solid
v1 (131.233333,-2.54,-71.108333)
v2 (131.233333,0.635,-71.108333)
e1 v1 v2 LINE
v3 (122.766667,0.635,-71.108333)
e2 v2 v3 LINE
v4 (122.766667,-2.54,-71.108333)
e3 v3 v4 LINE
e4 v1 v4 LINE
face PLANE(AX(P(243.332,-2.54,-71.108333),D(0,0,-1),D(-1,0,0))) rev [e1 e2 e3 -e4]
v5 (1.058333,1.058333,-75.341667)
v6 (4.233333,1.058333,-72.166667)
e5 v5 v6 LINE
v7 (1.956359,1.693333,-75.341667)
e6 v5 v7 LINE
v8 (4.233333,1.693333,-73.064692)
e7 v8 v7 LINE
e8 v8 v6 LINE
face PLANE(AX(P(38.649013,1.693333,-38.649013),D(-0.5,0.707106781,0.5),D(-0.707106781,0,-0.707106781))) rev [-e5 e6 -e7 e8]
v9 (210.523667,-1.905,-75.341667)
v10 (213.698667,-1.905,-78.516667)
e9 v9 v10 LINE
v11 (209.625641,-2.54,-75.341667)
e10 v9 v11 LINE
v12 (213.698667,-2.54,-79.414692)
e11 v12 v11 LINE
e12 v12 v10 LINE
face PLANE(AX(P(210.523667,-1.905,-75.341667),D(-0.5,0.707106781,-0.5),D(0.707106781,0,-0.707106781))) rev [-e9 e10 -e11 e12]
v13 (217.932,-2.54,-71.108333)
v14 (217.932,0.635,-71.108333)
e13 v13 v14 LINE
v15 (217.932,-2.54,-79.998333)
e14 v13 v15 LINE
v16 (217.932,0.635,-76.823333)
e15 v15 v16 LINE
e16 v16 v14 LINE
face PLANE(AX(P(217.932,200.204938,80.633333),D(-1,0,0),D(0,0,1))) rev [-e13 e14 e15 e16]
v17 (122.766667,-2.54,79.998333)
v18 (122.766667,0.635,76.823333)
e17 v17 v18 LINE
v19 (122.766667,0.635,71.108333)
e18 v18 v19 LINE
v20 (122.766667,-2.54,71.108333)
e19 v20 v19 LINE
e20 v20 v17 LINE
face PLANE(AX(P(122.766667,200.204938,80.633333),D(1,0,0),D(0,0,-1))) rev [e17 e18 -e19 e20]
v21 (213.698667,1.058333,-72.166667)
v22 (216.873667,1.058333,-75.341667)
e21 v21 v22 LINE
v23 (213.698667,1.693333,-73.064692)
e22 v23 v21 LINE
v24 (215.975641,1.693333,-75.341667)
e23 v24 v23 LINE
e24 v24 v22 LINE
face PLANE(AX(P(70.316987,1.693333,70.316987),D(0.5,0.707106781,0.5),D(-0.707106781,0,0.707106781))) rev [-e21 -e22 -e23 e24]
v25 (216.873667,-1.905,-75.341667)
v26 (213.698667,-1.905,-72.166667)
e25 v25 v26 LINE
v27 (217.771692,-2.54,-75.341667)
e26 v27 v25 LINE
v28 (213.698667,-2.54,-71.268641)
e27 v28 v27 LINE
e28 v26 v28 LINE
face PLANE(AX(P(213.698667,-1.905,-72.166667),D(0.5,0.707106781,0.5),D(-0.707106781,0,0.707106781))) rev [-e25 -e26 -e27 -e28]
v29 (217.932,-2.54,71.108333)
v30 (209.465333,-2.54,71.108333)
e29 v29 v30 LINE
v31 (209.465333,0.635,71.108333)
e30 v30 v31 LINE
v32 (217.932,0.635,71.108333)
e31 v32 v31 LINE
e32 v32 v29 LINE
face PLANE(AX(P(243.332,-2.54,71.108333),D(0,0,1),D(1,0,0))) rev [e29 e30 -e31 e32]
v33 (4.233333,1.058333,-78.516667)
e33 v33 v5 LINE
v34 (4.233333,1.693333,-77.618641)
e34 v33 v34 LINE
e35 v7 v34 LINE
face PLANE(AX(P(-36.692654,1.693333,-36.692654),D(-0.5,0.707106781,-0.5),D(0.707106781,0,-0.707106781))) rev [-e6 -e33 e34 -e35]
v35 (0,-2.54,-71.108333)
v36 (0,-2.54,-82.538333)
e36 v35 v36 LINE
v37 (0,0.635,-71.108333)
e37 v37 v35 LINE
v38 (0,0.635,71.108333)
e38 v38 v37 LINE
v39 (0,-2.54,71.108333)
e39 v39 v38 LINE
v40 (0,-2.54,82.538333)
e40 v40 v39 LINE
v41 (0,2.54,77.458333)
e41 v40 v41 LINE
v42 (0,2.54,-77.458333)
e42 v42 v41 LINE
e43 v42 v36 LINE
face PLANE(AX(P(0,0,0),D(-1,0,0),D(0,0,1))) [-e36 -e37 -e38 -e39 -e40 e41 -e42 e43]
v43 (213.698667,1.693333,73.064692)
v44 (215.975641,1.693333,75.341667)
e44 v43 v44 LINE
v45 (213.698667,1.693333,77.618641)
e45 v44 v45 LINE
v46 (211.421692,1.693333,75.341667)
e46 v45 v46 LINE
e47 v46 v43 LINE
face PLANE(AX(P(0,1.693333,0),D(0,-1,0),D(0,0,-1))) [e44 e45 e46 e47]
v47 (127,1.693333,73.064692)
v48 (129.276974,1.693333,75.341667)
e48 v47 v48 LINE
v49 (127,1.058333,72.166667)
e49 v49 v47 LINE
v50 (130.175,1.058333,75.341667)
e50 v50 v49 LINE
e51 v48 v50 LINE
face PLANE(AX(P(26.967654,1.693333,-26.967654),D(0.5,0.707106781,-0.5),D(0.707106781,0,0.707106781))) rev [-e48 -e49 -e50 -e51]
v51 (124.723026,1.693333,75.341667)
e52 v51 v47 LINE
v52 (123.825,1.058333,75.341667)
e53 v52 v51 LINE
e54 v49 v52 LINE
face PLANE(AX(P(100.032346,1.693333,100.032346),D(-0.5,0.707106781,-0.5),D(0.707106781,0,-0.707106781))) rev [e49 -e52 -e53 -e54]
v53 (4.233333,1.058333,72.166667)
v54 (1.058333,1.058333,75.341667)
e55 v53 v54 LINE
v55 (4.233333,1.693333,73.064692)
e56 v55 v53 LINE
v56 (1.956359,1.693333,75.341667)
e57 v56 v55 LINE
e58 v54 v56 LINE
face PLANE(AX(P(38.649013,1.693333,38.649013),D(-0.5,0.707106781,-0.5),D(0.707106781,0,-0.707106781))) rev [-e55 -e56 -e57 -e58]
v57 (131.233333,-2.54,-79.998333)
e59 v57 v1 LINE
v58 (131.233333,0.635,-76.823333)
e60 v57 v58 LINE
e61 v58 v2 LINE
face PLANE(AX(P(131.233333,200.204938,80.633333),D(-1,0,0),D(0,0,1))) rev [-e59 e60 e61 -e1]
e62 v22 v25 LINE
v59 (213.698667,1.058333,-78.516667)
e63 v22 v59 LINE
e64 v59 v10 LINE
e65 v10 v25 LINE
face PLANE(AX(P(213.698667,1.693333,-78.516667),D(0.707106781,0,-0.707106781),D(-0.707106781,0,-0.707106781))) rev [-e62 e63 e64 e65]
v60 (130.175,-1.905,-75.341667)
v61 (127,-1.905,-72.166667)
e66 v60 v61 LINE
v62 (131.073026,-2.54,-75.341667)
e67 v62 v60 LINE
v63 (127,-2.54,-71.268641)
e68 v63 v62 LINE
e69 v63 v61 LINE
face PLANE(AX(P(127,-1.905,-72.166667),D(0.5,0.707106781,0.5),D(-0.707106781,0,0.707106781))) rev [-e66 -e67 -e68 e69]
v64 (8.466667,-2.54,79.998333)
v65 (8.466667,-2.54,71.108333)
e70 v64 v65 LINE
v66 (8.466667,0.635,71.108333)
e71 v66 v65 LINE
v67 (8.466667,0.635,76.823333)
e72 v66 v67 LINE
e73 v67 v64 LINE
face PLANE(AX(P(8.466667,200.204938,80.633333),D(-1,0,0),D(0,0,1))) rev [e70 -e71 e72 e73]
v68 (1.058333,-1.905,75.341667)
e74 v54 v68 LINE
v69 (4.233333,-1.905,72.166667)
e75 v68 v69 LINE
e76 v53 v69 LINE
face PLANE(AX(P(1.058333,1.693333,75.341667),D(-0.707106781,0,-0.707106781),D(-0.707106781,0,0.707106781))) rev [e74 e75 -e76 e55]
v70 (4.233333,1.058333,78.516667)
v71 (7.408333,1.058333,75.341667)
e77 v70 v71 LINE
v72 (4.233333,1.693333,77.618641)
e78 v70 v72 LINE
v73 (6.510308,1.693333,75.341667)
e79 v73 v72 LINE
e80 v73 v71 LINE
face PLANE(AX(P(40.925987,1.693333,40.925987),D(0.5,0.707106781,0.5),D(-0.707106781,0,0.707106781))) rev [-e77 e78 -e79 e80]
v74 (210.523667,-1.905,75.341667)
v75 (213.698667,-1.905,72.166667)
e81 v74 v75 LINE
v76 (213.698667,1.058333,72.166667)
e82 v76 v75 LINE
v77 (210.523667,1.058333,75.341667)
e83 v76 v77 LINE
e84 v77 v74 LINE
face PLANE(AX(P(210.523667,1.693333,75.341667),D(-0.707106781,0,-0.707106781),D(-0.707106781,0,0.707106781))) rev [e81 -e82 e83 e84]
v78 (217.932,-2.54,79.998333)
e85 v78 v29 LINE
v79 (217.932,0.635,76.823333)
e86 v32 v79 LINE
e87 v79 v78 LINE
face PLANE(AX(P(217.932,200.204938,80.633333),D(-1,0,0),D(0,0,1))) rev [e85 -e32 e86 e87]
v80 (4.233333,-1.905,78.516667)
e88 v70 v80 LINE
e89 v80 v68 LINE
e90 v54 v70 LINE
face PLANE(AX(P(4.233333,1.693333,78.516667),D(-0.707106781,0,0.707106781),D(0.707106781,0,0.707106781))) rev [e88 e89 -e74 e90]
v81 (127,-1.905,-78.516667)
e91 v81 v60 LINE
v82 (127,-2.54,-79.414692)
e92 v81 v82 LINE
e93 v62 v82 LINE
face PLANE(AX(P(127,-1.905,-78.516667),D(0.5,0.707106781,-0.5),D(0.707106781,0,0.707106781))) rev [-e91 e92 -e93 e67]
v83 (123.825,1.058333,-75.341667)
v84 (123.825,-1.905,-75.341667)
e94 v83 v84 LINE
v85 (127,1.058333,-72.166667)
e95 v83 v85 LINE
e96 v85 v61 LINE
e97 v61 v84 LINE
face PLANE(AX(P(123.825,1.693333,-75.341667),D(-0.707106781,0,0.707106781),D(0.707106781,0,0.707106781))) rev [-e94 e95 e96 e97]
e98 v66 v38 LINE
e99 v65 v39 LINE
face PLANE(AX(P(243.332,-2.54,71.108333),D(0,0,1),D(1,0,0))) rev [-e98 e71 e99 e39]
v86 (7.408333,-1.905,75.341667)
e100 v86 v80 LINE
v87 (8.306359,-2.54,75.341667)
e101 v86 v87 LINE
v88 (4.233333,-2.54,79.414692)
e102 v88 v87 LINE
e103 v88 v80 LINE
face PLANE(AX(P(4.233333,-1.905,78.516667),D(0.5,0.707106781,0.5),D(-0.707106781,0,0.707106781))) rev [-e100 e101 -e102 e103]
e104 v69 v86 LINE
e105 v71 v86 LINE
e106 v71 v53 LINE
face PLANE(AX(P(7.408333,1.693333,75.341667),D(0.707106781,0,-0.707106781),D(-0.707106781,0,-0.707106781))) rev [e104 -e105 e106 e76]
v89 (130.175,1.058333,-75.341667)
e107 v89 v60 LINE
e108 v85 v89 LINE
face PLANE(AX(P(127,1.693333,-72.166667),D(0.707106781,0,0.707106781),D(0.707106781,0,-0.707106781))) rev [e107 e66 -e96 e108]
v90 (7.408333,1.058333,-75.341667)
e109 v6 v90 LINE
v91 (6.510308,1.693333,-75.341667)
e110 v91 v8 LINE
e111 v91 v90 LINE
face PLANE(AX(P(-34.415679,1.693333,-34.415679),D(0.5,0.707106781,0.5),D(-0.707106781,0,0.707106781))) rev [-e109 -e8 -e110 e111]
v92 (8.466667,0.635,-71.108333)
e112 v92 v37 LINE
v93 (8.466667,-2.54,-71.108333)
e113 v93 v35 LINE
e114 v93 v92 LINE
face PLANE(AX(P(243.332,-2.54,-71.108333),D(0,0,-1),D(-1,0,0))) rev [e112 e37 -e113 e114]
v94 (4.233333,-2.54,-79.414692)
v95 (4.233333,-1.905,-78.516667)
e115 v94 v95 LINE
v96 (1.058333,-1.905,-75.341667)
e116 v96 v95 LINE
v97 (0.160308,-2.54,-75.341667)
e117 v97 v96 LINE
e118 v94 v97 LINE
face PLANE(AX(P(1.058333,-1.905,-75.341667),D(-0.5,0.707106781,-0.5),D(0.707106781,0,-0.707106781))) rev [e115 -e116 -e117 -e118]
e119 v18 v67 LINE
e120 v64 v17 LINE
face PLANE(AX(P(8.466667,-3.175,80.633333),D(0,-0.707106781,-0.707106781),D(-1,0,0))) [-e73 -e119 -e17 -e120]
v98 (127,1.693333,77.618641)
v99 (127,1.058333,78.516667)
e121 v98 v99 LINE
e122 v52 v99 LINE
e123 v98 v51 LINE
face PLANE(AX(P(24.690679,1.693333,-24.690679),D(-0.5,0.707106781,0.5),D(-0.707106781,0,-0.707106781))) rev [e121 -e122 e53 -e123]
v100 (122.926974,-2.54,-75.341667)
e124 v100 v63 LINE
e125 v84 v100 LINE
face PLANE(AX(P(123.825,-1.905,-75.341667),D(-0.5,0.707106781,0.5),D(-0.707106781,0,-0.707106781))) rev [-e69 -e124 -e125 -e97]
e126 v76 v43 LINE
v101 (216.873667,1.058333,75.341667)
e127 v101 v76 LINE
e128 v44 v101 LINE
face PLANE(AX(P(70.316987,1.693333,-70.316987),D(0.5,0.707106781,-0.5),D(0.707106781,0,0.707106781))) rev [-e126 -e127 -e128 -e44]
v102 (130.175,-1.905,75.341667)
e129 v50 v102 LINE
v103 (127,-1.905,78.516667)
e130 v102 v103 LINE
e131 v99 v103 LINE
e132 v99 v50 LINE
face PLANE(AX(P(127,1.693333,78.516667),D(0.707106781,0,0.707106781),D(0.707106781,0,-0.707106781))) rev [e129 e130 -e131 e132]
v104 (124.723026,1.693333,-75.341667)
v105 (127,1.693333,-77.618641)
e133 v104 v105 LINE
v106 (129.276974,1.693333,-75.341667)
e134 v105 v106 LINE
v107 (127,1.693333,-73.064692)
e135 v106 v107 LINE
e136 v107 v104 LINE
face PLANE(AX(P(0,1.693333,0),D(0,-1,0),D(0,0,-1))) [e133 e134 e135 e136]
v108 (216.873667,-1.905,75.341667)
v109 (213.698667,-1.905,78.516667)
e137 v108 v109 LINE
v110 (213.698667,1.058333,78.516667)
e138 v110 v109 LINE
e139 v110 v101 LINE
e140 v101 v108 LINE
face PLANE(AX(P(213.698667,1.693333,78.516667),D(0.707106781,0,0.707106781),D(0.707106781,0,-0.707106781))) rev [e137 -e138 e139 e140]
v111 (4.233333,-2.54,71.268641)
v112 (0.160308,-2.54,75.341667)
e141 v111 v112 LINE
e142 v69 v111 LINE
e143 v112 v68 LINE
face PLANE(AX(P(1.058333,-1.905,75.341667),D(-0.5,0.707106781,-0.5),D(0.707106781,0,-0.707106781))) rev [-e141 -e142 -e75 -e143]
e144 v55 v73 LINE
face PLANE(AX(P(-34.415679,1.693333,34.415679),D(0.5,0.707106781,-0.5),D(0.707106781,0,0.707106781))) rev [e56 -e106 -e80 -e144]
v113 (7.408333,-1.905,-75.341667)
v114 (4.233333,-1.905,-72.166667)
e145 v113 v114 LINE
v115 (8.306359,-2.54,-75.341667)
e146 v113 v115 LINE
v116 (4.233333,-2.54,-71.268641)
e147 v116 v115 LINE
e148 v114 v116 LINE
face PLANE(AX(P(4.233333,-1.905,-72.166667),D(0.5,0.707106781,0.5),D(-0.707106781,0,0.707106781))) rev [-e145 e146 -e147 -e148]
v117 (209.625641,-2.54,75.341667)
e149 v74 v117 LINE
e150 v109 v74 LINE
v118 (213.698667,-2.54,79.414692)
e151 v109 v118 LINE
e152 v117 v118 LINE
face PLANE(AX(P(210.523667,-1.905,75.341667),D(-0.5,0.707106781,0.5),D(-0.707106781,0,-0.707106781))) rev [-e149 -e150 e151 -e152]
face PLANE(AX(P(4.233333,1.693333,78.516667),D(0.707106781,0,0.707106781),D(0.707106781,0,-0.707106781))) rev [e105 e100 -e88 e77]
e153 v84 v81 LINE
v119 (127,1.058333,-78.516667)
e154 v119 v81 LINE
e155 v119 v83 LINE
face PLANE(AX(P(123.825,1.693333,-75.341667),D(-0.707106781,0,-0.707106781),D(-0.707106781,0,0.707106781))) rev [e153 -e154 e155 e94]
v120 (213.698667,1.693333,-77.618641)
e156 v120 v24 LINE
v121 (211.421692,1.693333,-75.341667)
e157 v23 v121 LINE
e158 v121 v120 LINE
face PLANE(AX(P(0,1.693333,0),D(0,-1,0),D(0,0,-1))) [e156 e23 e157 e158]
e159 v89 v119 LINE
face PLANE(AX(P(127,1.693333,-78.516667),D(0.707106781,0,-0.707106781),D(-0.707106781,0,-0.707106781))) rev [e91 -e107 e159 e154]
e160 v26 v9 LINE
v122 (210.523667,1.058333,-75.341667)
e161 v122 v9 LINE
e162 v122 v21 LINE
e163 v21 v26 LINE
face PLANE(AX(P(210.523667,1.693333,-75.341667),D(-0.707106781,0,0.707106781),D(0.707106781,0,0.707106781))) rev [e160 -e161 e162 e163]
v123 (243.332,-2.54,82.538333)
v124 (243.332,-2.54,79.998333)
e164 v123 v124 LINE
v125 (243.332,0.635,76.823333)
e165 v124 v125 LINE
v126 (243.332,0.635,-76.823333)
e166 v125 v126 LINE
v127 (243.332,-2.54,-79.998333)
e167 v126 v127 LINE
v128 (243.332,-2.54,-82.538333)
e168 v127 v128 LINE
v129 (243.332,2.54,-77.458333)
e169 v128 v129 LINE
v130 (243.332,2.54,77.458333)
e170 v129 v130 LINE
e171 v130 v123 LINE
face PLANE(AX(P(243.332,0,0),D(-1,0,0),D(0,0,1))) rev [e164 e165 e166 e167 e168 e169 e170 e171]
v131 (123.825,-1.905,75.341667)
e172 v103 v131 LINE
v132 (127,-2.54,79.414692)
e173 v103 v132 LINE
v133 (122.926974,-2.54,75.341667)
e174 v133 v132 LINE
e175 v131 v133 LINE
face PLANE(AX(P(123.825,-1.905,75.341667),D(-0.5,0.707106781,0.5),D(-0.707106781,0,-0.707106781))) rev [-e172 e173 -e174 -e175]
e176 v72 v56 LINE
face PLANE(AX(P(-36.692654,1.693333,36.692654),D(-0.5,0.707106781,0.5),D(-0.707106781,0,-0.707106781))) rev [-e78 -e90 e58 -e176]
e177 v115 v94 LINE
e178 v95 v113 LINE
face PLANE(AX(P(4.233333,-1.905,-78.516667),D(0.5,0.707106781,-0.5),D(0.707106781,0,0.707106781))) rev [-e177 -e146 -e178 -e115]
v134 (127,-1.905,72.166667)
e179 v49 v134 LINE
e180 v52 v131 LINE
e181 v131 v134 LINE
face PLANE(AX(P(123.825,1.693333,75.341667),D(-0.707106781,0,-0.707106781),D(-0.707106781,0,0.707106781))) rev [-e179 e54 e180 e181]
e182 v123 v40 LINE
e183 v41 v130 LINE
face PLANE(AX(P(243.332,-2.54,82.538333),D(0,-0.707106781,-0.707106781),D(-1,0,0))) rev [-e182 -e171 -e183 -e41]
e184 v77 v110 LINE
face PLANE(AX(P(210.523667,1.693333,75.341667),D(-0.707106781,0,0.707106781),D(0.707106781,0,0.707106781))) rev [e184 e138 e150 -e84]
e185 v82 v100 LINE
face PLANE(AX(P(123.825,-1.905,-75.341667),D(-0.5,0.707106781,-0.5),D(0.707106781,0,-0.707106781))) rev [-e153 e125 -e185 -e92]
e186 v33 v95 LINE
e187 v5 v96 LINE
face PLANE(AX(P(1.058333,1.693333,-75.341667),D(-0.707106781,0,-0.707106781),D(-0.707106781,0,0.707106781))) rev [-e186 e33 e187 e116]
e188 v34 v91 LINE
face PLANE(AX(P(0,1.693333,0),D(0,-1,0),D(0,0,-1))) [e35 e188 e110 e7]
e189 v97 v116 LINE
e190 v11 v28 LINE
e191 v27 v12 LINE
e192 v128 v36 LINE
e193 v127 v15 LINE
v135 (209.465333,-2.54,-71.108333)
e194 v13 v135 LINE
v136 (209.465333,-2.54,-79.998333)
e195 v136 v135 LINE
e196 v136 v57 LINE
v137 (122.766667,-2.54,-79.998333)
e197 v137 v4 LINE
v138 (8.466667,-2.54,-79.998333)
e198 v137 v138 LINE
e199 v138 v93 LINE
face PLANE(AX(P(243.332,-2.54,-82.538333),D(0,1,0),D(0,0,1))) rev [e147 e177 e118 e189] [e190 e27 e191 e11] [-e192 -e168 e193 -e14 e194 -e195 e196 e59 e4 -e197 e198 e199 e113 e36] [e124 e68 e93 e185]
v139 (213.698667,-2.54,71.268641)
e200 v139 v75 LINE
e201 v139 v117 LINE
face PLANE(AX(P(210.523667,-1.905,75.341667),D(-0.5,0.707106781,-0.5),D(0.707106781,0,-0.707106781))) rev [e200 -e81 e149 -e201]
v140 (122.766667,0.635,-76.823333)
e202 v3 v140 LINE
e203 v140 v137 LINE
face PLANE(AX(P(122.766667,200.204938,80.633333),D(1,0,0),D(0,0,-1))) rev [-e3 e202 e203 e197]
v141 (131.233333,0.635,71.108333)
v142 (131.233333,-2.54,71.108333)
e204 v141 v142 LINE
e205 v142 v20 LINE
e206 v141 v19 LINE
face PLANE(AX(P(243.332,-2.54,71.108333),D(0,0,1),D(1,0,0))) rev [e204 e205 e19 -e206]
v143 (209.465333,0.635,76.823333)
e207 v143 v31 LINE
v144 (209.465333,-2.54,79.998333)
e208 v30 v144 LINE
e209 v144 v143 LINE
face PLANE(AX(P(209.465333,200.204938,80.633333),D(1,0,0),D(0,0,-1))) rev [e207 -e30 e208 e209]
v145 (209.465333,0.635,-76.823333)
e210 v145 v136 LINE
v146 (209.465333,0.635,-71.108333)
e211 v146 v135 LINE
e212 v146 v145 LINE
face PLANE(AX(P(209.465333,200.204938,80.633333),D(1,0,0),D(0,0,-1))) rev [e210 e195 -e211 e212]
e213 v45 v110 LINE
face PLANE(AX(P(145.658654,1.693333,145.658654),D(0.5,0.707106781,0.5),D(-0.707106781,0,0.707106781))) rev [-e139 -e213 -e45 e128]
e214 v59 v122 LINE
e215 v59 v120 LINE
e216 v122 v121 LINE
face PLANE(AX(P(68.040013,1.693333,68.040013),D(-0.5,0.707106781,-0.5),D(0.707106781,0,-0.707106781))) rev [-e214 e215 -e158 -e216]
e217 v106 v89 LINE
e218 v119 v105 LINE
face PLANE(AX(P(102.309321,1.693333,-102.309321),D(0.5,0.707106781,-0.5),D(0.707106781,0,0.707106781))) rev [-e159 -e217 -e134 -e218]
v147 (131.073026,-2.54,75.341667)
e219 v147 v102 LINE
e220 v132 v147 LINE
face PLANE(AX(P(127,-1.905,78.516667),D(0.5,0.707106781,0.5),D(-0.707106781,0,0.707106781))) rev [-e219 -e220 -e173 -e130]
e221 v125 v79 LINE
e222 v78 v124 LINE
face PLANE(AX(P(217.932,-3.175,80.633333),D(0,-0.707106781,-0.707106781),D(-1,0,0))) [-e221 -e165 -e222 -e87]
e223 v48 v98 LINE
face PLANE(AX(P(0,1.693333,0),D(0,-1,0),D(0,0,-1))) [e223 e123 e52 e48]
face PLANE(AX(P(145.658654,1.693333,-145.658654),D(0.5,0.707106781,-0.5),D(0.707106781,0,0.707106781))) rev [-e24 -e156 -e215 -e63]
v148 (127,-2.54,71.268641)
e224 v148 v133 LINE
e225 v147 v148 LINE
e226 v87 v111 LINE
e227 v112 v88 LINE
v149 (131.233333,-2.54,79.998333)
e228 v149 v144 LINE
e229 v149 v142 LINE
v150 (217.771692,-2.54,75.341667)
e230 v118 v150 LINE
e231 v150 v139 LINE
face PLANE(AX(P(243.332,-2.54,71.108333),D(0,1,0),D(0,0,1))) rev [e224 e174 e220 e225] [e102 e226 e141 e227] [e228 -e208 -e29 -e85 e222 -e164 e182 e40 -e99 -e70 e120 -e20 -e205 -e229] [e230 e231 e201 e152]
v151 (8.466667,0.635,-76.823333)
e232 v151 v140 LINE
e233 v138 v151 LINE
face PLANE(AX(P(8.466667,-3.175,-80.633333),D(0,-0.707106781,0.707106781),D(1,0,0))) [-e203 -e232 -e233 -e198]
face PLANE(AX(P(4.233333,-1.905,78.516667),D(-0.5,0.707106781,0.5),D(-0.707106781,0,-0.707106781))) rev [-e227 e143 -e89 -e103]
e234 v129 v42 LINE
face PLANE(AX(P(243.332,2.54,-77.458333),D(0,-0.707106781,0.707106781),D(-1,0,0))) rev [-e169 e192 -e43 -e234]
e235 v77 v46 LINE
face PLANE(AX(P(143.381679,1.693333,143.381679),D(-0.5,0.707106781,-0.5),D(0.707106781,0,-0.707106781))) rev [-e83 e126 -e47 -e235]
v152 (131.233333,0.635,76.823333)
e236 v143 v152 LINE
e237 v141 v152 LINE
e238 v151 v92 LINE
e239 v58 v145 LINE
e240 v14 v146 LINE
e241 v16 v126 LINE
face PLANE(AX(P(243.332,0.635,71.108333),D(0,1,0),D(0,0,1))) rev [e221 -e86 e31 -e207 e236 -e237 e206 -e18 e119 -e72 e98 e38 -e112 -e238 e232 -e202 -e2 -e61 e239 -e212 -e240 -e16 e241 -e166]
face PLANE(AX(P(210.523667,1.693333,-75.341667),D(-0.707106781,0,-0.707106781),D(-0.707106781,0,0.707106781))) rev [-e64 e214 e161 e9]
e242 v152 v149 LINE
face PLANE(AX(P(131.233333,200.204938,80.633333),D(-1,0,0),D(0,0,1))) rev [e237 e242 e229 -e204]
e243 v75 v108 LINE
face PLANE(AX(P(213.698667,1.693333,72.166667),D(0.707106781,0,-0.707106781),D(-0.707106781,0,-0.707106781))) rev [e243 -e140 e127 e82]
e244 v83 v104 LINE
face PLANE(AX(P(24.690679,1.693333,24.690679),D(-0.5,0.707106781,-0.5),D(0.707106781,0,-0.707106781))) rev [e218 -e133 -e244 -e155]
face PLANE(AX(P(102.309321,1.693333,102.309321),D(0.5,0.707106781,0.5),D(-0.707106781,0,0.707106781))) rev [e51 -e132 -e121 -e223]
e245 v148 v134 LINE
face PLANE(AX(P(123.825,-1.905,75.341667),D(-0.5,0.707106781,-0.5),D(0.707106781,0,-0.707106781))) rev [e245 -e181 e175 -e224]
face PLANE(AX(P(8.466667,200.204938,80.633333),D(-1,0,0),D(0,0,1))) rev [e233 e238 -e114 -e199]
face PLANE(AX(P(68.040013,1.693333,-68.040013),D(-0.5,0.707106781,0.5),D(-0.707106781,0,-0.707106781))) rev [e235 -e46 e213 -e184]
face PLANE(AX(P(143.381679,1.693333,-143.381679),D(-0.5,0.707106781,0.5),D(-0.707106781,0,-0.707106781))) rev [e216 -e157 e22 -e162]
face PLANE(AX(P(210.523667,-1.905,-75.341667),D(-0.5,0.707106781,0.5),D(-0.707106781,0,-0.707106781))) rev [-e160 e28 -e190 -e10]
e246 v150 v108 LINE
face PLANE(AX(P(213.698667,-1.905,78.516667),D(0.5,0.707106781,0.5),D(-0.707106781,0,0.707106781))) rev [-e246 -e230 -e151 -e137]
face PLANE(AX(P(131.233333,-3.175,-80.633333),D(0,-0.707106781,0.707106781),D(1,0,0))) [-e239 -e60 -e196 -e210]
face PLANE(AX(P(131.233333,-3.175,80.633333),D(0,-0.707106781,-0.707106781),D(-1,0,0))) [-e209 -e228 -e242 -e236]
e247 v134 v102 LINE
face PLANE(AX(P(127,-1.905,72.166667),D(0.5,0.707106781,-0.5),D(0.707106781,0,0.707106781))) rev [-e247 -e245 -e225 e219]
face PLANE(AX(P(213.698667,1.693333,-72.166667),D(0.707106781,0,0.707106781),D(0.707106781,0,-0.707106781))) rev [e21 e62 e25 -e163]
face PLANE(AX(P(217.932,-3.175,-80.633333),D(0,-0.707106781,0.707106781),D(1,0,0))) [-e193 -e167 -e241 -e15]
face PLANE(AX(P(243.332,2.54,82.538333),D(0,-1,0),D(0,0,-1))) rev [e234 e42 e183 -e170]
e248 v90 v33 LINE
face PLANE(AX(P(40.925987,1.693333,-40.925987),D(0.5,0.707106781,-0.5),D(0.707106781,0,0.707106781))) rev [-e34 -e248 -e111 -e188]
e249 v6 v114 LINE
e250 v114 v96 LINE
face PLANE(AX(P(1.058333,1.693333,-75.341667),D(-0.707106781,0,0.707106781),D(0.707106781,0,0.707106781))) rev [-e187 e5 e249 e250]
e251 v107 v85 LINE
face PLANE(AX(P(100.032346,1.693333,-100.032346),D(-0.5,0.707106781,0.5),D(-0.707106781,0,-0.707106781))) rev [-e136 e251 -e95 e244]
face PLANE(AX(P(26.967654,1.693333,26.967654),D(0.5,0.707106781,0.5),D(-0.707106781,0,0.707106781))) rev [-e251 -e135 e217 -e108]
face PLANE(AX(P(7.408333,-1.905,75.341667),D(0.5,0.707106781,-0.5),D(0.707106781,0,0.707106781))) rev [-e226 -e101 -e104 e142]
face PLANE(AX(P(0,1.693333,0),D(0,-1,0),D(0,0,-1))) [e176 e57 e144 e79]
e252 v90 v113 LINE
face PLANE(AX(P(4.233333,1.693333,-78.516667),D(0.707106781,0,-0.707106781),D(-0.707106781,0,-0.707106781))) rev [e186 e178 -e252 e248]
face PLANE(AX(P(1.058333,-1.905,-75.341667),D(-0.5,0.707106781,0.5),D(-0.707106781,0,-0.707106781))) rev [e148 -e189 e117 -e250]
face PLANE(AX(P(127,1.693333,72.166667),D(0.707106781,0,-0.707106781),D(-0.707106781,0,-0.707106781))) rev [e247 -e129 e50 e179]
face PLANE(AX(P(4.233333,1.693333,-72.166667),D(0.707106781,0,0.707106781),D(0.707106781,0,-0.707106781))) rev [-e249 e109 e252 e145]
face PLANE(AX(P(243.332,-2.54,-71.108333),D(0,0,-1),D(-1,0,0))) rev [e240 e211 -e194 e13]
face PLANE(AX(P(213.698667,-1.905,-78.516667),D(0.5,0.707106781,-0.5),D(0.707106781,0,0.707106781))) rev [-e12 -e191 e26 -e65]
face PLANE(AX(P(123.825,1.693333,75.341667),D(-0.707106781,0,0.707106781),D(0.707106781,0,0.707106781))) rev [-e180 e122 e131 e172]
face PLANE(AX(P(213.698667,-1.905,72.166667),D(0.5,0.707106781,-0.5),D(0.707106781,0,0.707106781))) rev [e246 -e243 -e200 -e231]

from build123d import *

# Parameters (mm, degrees)
BOSS_EXTRUDE1_DEPTH = 243.332
SKETCH2_W           = 114.3
SKETCH2_H           = 161.266666628
SKETCH2_W_2         = 78.232
SKETCH2_W_3         = 25.4
CUT_EXTRUDE1_DEPTH  = 3.175
CUT_EXTRUDE2_DEPTH  = 4.233333333
CHAMFER4_SIZE       = 0.635
CHAMFER3_SIZE       = 3.81
CHAMFER2_SIZE       = 5.08


# Some blends are built 0.0001 mm under size
with BuildPart() as part:
    # Sketch1 → Boss-Extrude1 (new body)
    with BuildSketch(Plane(origin=(0, 0, 0), x_dir=(0, 0, -1), z_dir=(1, 0, 0))):
        Polygon((-82.538333314, 2.54), (82.538333314, 2.54), (82.538333314, -2.54), (71.108333314, -2.54), (71.108333314, 0.635), (-71.108333314, 0.635), (-71.108333314, -2.54), (-82.538333314, -2.54), align=None)
    extrude(amount=BOSS_EXTRUDE1_DEPTH)

    # Sketch2 → Cut-Extrude1 (cut)
    with BuildSketch(Plane.XZ.offset(2.54)):
        with Locations((65.616666667, 0)):
            Rectangle(SKETCH2_W, SKETCH2_H)
        with Locations((170.349333333, 0)):
            Rectangle(SKETCH2_W_2, SKETCH2_H)
        with Locations((230.632, 0)):
            Rectangle(SKETCH2_W_3, SKETCH2_H)
    extrude(amount=-CUT_EXTRUDE1_DEPTH, mode=Mode.SUBTRACT)

    # Sketch4 → Cut-Extrude2 (cut)
    with BuildSketch(Plane.XZ.offset(2.54)):
        Polygon((4.233333333, 78.516666648), (7.408333333, 75.341666648), (4.233333333, 72.166666648), (1.058333333, 75.341666648), align=None)
        Polygon((210.523666667, 75.341666648), (213.698666667, 78.516666648), (216.873666667, 75.341666648), (213.698666667, 72.166666648), align=None)
        Polygon((123.825, 75.341666648), (127, 78.516666648), (130.175, 75.341666648), (127, 72.166666648), align=None)
        Polygon((1.058333333, -75.341666648), (4.233333333, -72.166666648), (7.408333333, -75.341666648), (4.233333333, -78.516666648), align=None)
        Polygon((123.825, -75.341666648), (127, -72.166666648), (130.175, -75.341666648), (127, -78.516666648), align=None)
        Polygon((210.523666667, -75.341666648), (213.698666667, -72.166666648), (216.873666667, -75.341666648), (213.698666667, -78.516666648), align=None)
    extrude(amount=-CUT_EXTRUDE2_DEPTH, mode=Mode.SUBTRACT)

    # Chamfer4
    chamfer4_edges = [part.edges().sort_by_distance(p)[0] for p in [
        (125.4125, 1.693333333, 73.754166648),
        (125.4125, 1.693333333, 76.929166648),
        (128.5875, 1.693333333, 76.929166648),
        (128.5875, 1.693333333, 73.754166648),
        (125.4125, -2.54, 73.754166648),
        (128.5875, -2.54, 73.754166648),
        (128.5875, -2.54, 76.929166648),
        (125.4125, -2.54, 76.929166648),
        (212.111166667, 1.693333333, 73.754166648),
        (212.111166667, 1.693333333, 76.929166648),
        (215.286166667, 1.693333333, 76.929166648),
        (215.286166667, 1.693333333, 73.754166648),
        (212.111166667, -2.54, 73.754166648),
        (215.286166667, -2.54, 73.754166648),
        (215.286166667, -2.54, 76.929166648),
        (212.111166667, -2.54, 76.929166648),
        (2.645833333, 1.693333333, -76.929166648),
        (2.645833333, 1.693333333, -73.754166648),
        (5.820833333, 1.693333333, -73.754166648),
        (5.820833333, 1.693333333, -76.929166648),
        (2.645833333, -2.54, -76.929166648),
        (5.820833333, -2.54, -76.929166648),
        (5.820833333, -2.54, -73.754166648),
        (2.645833333, -2.54, -73.754166648),
        (125.4125, 1.693333333, -76.929166648),
        (125.4125, 1.693333333, -73.754166648),
        (128.5875, 1.693333333, -73.754166648),
        (128.5875, 1.693333333, -76.929166648),
        (125.4125, -2.54, -76.929166648),
        (128.5875, -2.54, -76.929166648),
        (128.5875, -2.54, -73.754166648),
        (125.4125, -2.54, -73.754166648),
        (212.111166667, 1.693333333, -76.929166648),
        (212.111166667, 1.693333333, -73.754166648),
        (215.286166667, 1.693333333, -73.754166648),
        (215.286166667, 1.693333333, -76.929166648),
        (212.111166667, -2.54, -76.929166648),
        (215.286166667, -2.54, -76.929166648),
        (215.286166667, -2.54, -73.754166648),
        (212.111166667, -2.54, -73.754166648),
        (2.645833333, 1.693333333, 76.929166648),
        (5.820833333, 1.693333333, 76.929166648),
        (5.820833333, 1.693333333, 73.754166648),
        (2.645833333, 1.693333333, 73.754166648),
        (2.645833333, -2.54, 76.929166648),
        (2.645833333, -2.54, 73.754166648),
        (5.820833333, -2.54, 73.754166648),
        (5.820833333, -2.54, 76.929166648),
    ]]
    chamfer(chamfer4_edges, length=CHAMFER4_SIZE)

    # Chamfer3
    # the kernel refuses this chamfer: 3.81 mm, written as the material it adds along each edge
    with BuildSketch(Plane(origin=(132.564778851, 0.635, -80.633333314), x_dir=(0, 0.027495876610586334, 0.9996219169112968), z_dir=(-1, 0, 0))) as chamfer3_piece_1_section:
        Polygon((CHAMFER3_SIZE * 0.999621916911, -CHAMFER3_SIZE * 0.0274958766106), (-CHAMFER3_SIZE * 0.0274958766106, -CHAMFER3_SIZE * 0.999621916911), (0, 0), align=None)
    chamfer3_piece_1 = extrude(amount=133.896224368, mode=Mode.PRIVATE)
    chamfer3_piece_1 = split(chamfer3_piece_1, bisect_by=Plane(origin=(131.899056092, -2.54, -79.333095219), z_dir=(0, 1, 0)), keep=Keep.TOP, mode=Mode.PRIVATE)
    chamfer3_piece_1 = split(chamfer3_piece_1, bisect_by=Plane(origin=(129.04131376, -0.57452381, -76.475352887), z_dir=(0.7071067811865444, 0, -0.7071067811865507)), keep=Keep.TOP, mode=Mode.PRIVATE)
    add(chamfer3_piece_1)
    with BuildSketch(Plane(origin=(132.564778851, 0.635, -80.633333314), x_dir=(0, 0.027495876610586334, 0.9996219169112968), z_dir=(-1, 0, 0))) as chamfer3_piece_2_section:
        Polygon((CHAMFER3_SIZE * 0.999621916911, -CHAMFER3_SIZE * 0.0274958766106), (-CHAMFER3_SIZE * 0.0274958766106, -CHAMFER3_SIZE * 0.999621916911), (0, 0), align=None)
    chamfer3_piece_2 = extrude(amount=133.896224368, mode=Mode.PRIVATE)
    chamfer3_piece_2 = split(chamfer3_piece_2, bisect_by=Plane(origin=(65.616666667, -2.54, -79.333095219), z_dir=(0, 1, 0)), keep=Keep.TOP, mode=Mode.PRIVATE)
    chamfer3_piece_2 = split(chamfer3_piece_2, bisect_by=Plane(origin=(34.516785714, -0.57452381, -48.233214267), z_dir=(0.7071067811865476, 0, -0.7071067811865476)), keep=Keep.TOP, mode=Mode.PRIVATE)
    chamfer3_piece_2 = split(chamfer3_piece_2, bisect_by=Plane(origin=(96.716547619, -0.57452381, -48.233214267), z_dir=(-0.7071067811865444, 0, -0.7071067811865507)), keep=Keep.TOP, mode=Mode.PRIVATE)
    add(chamfer3_piece_2)
    with BuildSketch(Plane(origin=(219.263445517, 0.635, -80.633333314), x_dir=(0, 0.027495876610586334, 0.9996219169112968), z_dir=(-1, 0, 0))) as chamfer3_piece_3_section:
        Polygon((CHAMFER3_SIZE * 0.999621916911, -CHAMFER3_SIZE * 0.0274958766106), (-CHAMFER3_SIZE * 0.0274958766106, -CHAMFER3_SIZE * 0.999621916911), (0, 0), align=None)
    chamfer3_piece_3 = extrude(amount=97.828224368, mode=Mode.PRIVATE)
    chamfer3_piece_3 = split(chamfer3_piece_3, bisect_by=Plane(origin=(218.597722759, -2.54, -79.333095219), z_dir=(0, 1, 0)), keep=Keep.TOP, mode=Mode.PRIVATE)
    chamfer3_piece_3 = split(chamfer3_piece_3, bisect_by=Plane(origin=(215.739980427, -0.57452381, -76.475352887), z_dir=(0.7071067811865507, 0, -0.7071067811865444)), keep=Keep.TOP, mode=Mode.PRIVATE)
    add(chamfer3_piece_3)
    with BuildSketch(Plane(origin=(219.263445517, 0.635, -80.633333314), x_dir=(0, 0.027495876610586334, 0.9996219169112968), z_dir=(-1, 0, 0))) as chamfer3_piece_4_section:
        Polygon((CHAMFER3_SIZE * 0.999621916911, -CHAMFER3_SIZE * 0.0274958766106), (-CHAMFER3_SIZE * 0.0274958766106, -CHAMFER3_SIZE * 0.999621916911), (0, 0), align=None)
    chamfer3_piece_4 = extrude(amount=97.828224368, mode=Mode.PRIVATE)
    chamfer3_piece_4 = split(chamfer3_piece_4, bisect_by=Plane(origin=(170.349333333, -2.54, -79.333095219), z_dir=(0, 1, 0)), keep=Keep.TOP, mode=Mode.PRIVATE)
    chamfer3_piece_4 = split(chamfer3_piece_4, bisect_by=Plane(origin=(148.266452381, -0.57452381, -57.250214267), z_dir=(0.7071067811865444, 0, -0.7071067811865507)), keep=Keep.TOP, mode=Mode.PRIVATE)
    chamfer3_piece_4 = split(chamfer3_piece_4, bisect_by=Plane(origin=(192.432214286, -0.57452381, -57.250214267), z_dir=(-0.7071067811865507, 0, -0.7071067811865444)), keep=Keep.TOP, mode=Mode.PRIVATE)
    add(chamfer3_piece_4)
    with BuildSketch(Plane(origin=(219.263445517, 0.635, -80.633333314), x_dir=(0, 0.027495876610586334, 0.9996219169112968), z_dir=(-1, 0, 0))) as chamfer3_piece_5_section:
        Polygon((CHAMFER3_SIZE * 0.999621916911, -CHAMFER3_SIZE * 0.0274958766106), (-CHAMFER3_SIZE * 0.0274958766106, -CHAMFER3_SIZE * 0.999621916911), (0, 0), align=None)
    chamfer3_piece_5 = extrude(amount=97.828224368, mode=Mode.PRIVATE)
    chamfer3_piece_5 = split(chamfer3_piece_5, bisect_by=Plane(origin=(122.100943908, -2.54, -79.333095219), z_dir=(0, 1, 0)), keep=Keep.TOP, mode=Mode.PRIVATE)
    chamfer3_piece_5 = split(chamfer3_piece_5, bisect_by=Plane(origin=(124.95868624, -0.57452381, -76.475352887), z_dir=(-0.7071067811865444, 0, -0.7071067811865507)), keep=Keep.TOP, mode=Mode.PRIVATE)
    add(chamfer3_piece_5)
    with BuildSketch(Plane(origin=(243.332, 0.635, -80.633333314), x_dir=(0, 0.027495876610580335, 0.999621916911297), z_dir=(-1, 0, 0))) as chamfer3_piece_6_section:
        Polygon((CHAMFER3_SIZE * 0.999621916911, -CHAMFER3_SIZE * 0.0274958766106), (-CHAMFER3_SIZE * 0.0274958766106, -CHAMFER3_SIZE * 0.999621916911), (0, 0), align=None)
    chamfer3_piece_6 = extrude(amount=35.198112184, mode=Mode.PRIVATE)
    chamfer3_piece_6 = split(chamfer3_piece_6, bisect_by=Plane(origin=(230.632, -2.54, -79.333095219), z_dir=(0, 1, 0)), keep=Keep.TOP, mode=Mode.PRIVATE)
    chamfer3_piece_6 = split(chamfer3_piece_6, bisect_by=Plane(origin=(221.757119048, -0.57452381, -70.458214267), z_dir=(0.7071067811865507, 0, -0.7071067811865444)), keep=Keep.TOP, mode=Mode.PRIVATE)
    add(chamfer3_piece_6)
    with BuildSketch(Plane(origin=(253.130112184, 0.635, -80.633333314), x_dir=(0, 0.027495876610586334, 0.9996219169112968), z_dir=(-1, 0, 0))) as chamfer3_piece_7_section:
        Polygon((CHAMFER3_SIZE * 0.999621916911, -CHAMFER3_SIZE * 0.0274958766106), (-CHAMFER3_SIZE * 0.0274958766106, -CHAMFER3_SIZE * 0.999621916911), (0, 0), align=None)
    chamfer3_piece_7 = extrude(amount=44.996224368, mode=Mode.PRIVATE)
    chamfer3_piece_7 = split(chamfer3_piece_7, bisect_by=Plane(origin=(208.799610575, -2.54, -79.333095219), z_dir=(0, 1, 0)), keep=Keep.TOP, mode=Mode.PRIVATE)
    chamfer3_piece_7 = split(chamfer3_piece_7, bisect_by=Plane(origin=(211.657352906, -0.57452381, -76.475352887), z_dir=(-0.7071067811865507, 0, -0.7071067811865444)), keep=Keep.TOP, mode=Mode.PRIVATE)
    add(chamfer3_piece_7)
    with BuildSketch(Plane(origin=(208.133887816, 0.635, 80.633333314), x_dir=(0, -0.9996219169112968, 0.027495876610586382), z_dir=(1, 0, 0))) as chamfer3_piece_8_section:
        Polygon((CHAMFER3_SIZE * 0.999621916911, CHAMFER3_SIZE * 0.0274958766106), (-CHAMFER3_SIZE * 0.0274958766106, CHAMFER3_SIZE * 0.999621916911), (0, 0), align=None)
    chamfer3_piece_8 = extrude(amount=44.996224368, mode=Mode.PRIVATE)
    chamfer3_piece_8 = split(chamfer3_piece_8, bisect_by=Plane(origin=(208.799610575, -2.54, 79.333095219), z_dir=(0, 1, 0)), keep=Keep.TOP, mode=Mode.PRIVATE)
    chamfer3_piece_8 = split(chamfer3_piece_8, bisect_by=Plane(origin=(211.657352906, -0.57452381, 76.475352887), z_dir=(-0.7071067811865301, 0, 0.7071067811865649)), keep=Keep.TOP, mode=Mode.PRIVATE)
    add(chamfer3_piece_8)
    with BuildSketch(Plane(origin=(208.133887816, 0.635, 80.633333314), x_dir=(0, -0.9996219169112968, 0.027495876610586382), z_dir=(1, 0, 0))) as chamfer3_piece_9_section:
        Polygon((CHAMFER3_SIZE * 0.999621916911, CHAMFER3_SIZE * 0.0274958766106), (-CHAMFER3_SIZE * 0.0274958766106, CHAMFER3_SIZE * 0.999621916911), (0, 0), align=None)
    chamfer3_piece_9 = extrude(amount=35.198112184, mode=Mode.PRIVATE)
    chamfer3_piece_9 = split(chamfer3_piece_9, bisect_by=Plane(origin=(230.632, -2.54, 79.333095219), z_dir=(0, 1, 0)), keep=Keep.TOP, mode=Mode.PRIVATE)
    chamfer3_piece_9 = split(chamfer3_piece_9, bisect_by=Plane(origin=(221.757119048, -0.57452381, 70.458214267), z_dir=(0.7071067811865619, 0, 0.7071067811865334)), keep=Keep.TOP, mode=Mode.PRIVATE)
    add(chamfer3_piece_9)
    with BuildSketch(Plane(origin=(121.435221149, 0.635, 80.633333314), x_dir=(0, -0.9996219169112968, 0.027495876610586382), z_dir=(1, 0, 0))) as chamfer3_piece_10_section:
        Polygon((CHAMFER3_SIZE * 0.999621916911, CHAMFER3_SIZE * 0.0274958766106), (-CHAMFER3_SIZE * 0.0274958766106, CHAMFER3_SIZE * 0.999621916911), (0, 0), align=None)
    chamfer3_piece_10 = extrude(amount=97.828224368, mode=Mode.PRIVATE)
    chamfer3_piece_10 = split(chamfer3_piece_10, bisect_by=Plane(origin=(122.100943908, -2.54, 79.333095219), z_dir=(0, 1, 0)), keep=Keep.TOP, mode=Mode.PRIVATE)
    chamfer3_piece_10 = split(chamfer3_piece_10, bisect_by=Plane(origin=(124.95868624, -0.57452381, 76.475352887), z_dir=(-0.7071067811865476, 0, 0.7071067811865476)), keep=Keep.TOP, mode=Mode.PRIVATE)
    add(chamfer3_piece_10)
    with BuildSketch(Plane(origin=(121.435221149, 0.635, 80.633333314), x_dir=(0, -0.9996219169112968, 0.027495876610586382), z_dir=(1, 0, 0))) as chamfer3_piece_11_section:
        Polygon((CHAMFER3_SIZE * 0.999621916911, CHAMFER3_SIZE * 0.0274958766106), (-CHAMFER3_SIZE * 0.0274958766106, CHAMFER3_SIZE * 0.999621916911), (0, 0), align=None)
    chamfer3_piece_11 = extrude(amount=97.828224368, mode=Mode.PRIVATE)
    chamfer3_piece_11 = split(chamfer3_piece_11, bisect_by=Plane(origin=(170.349333333, -2.54, 79.333095219), z_dir=(0, 1, 0)), keep=Keep.TOP, mode=Mode.PRIVATE)
    chamfer3_piece_11 = split(chamfer3_piece_11, bisect_by=Plane(origin=(148.266452381, -0.57452381, 57.250214267), z_dir=(0.7071067811865459, 0, 0.7071067811865491)), keep=Keep.TOP, mode=Mode.PRIVATE)
    chamfer3_piece_11 = split(chamfer3_piece_11, bisect_by=Plane(origin=(192.432214286, -0.57452381, 57.250214267), z_dir=(-0.7071067811865301, 0, 0.7071067811865649)), keep=Keep.TOP, mode=Mode.PRIVATE)
    add(chamfer3_piece_11)
    with BuildSketch(Plane(origin=(121.435221149, 0.635, 80.633333314), x_dir=(0, -0.9996219169112968, 0.027495876610586382), z_dir=(1, 0, 0))) as chamfer3_piece_12_section:
        Polygon((CHAMFER3_SIZE * 0.999621916911, CHAMFER3_SIZE * 0.0274958766106), (-CHAMFER3_SIZE * 0.0274958766106, CHAMFER3_SIZE * 0.999621916911), (0, 0), align=None)
    chamfer3_piece_12 = extrude(amount=97.828224368, mode=Mode.PRIVATE)
    chamfer3_piece_12 = split(chamfer3_piece_12, bisect_by=Plane(origin=(218.597722759, -2.54, 79.333095219), z_dir=(0, 1, 0)), keep=Keep.TOP, mode=Mode.PRIVATE)
    chamfer3_piece_12 = split(chamfer3_piece_12, bisect_by=Plane(origin=(215.739980427, -0.57452381, 76.475352887), z_dir=(0.7071067811865619, 0, 0.7071067811865334)), keep=Keep.TOP, mode=Mode.PRIVATE)
    add(chamfer3_piece_12)
    with BuildSketch(Plane(origin=(-1.331445517, 0.635, 80.633333314), x_dir=(0, -0.9996219169112968, 0.027495876610586382), z_dir=(1, 0, 0))) as chamfer3_piece_13_section:
        Polygon((CHAMFER3_SIZE * 0.999621916911, CHAMFER3_SIZE * 0.0274958766106), (-CHAMFER3_SIZE * 0.0274958766106, CHAMFER3_SIZE * 0.999621916911), (0, 0), align=None)
    chamfer3_piece_13 = extrude(amount=133.896224368, mode=Mode.PRIVATE)
    chamfer3_piece_13 = split(chamfer3_piece_13, bisect_by=Plane(origin=(65.616666667, -2.54, 79.333095219), z_dir=(0, 1, 0)), keep=Keep.TOP, mode=Mode.PRIVATE)
    chamfer3_piece_13 = split(chamfer3_piece_13, bisect_by=Plane(origin=(96.716547619, -0.57452381, 48.233214267), z_dir=(-0.7071067811865476, 0, 0.7071067811865476)), keep=Keep.TOP, mode=Mode.PRIVATE)
    chamfer3_piece_13 = split(chamfer3_piece_13, bisect_by=Plane(origin=(34.516785714, -0.57452381, 48.233214267), z_dir=(0.7071067811865476, 0, 0.7071067811865476)), keep=Keep.TOP, mode=Mode.PRIVATE)
    add(chamfer3_piece_13)
    with BuildSketch(Plane(origin=(-1.331445517, 0.635, 80.633333314), x_dir=(0, -0.9996219169112968, 0.027495876610586382), z_dir=(1, 0, 0))) as chamfer3_piece_14_section:
        Polygon((CHAMFER3_SIZE * 0.999621916911, CHAMFER3_SIZE * 0.0274958766106), (-CHAMFER3_SIZE * 0.0274958766106, CHAMFER3_SIZE * 0.999621916911), (0, 0), align=None)
    chamfer3_piece_14 = extrude(amount=133.896224368, mode=Mode.PRIVATE)
    chamfer3_piece_14 = split(chamfer3_piece_14, bisect_by=Plane(origin=(131.899056092, -2.54, 79.333095219), z_dir=(0, 1, 0)), keep=Keep.TOP, mode=Mode.PRIVATE)
    chamfer3_piece_14 = split(chamfer3_piece_14, bisect_by=Plane(origin=(129.04131376, -0.57452381, 76.475352887), z_dir=(0.7071067811865459, 0, 0.7071067811865491)), keep=Keep.TOP, mode=Mode.PRIVATE)
    add(chamfer3_piece_14)

    # Chamfer2
    chamfer2_edges = [part.edges().sort_by_distance(p)[0] for p in [
        (121.666, 2.54, 82.538333314),
        (121.666, 2.54, -82.538333314),
    ]]
    chamfer(chamfer2_edges, length=CHAMFER2_SIZE - 0.0001)  # a hair under: the kernel refuses the full size


solid = part.part
